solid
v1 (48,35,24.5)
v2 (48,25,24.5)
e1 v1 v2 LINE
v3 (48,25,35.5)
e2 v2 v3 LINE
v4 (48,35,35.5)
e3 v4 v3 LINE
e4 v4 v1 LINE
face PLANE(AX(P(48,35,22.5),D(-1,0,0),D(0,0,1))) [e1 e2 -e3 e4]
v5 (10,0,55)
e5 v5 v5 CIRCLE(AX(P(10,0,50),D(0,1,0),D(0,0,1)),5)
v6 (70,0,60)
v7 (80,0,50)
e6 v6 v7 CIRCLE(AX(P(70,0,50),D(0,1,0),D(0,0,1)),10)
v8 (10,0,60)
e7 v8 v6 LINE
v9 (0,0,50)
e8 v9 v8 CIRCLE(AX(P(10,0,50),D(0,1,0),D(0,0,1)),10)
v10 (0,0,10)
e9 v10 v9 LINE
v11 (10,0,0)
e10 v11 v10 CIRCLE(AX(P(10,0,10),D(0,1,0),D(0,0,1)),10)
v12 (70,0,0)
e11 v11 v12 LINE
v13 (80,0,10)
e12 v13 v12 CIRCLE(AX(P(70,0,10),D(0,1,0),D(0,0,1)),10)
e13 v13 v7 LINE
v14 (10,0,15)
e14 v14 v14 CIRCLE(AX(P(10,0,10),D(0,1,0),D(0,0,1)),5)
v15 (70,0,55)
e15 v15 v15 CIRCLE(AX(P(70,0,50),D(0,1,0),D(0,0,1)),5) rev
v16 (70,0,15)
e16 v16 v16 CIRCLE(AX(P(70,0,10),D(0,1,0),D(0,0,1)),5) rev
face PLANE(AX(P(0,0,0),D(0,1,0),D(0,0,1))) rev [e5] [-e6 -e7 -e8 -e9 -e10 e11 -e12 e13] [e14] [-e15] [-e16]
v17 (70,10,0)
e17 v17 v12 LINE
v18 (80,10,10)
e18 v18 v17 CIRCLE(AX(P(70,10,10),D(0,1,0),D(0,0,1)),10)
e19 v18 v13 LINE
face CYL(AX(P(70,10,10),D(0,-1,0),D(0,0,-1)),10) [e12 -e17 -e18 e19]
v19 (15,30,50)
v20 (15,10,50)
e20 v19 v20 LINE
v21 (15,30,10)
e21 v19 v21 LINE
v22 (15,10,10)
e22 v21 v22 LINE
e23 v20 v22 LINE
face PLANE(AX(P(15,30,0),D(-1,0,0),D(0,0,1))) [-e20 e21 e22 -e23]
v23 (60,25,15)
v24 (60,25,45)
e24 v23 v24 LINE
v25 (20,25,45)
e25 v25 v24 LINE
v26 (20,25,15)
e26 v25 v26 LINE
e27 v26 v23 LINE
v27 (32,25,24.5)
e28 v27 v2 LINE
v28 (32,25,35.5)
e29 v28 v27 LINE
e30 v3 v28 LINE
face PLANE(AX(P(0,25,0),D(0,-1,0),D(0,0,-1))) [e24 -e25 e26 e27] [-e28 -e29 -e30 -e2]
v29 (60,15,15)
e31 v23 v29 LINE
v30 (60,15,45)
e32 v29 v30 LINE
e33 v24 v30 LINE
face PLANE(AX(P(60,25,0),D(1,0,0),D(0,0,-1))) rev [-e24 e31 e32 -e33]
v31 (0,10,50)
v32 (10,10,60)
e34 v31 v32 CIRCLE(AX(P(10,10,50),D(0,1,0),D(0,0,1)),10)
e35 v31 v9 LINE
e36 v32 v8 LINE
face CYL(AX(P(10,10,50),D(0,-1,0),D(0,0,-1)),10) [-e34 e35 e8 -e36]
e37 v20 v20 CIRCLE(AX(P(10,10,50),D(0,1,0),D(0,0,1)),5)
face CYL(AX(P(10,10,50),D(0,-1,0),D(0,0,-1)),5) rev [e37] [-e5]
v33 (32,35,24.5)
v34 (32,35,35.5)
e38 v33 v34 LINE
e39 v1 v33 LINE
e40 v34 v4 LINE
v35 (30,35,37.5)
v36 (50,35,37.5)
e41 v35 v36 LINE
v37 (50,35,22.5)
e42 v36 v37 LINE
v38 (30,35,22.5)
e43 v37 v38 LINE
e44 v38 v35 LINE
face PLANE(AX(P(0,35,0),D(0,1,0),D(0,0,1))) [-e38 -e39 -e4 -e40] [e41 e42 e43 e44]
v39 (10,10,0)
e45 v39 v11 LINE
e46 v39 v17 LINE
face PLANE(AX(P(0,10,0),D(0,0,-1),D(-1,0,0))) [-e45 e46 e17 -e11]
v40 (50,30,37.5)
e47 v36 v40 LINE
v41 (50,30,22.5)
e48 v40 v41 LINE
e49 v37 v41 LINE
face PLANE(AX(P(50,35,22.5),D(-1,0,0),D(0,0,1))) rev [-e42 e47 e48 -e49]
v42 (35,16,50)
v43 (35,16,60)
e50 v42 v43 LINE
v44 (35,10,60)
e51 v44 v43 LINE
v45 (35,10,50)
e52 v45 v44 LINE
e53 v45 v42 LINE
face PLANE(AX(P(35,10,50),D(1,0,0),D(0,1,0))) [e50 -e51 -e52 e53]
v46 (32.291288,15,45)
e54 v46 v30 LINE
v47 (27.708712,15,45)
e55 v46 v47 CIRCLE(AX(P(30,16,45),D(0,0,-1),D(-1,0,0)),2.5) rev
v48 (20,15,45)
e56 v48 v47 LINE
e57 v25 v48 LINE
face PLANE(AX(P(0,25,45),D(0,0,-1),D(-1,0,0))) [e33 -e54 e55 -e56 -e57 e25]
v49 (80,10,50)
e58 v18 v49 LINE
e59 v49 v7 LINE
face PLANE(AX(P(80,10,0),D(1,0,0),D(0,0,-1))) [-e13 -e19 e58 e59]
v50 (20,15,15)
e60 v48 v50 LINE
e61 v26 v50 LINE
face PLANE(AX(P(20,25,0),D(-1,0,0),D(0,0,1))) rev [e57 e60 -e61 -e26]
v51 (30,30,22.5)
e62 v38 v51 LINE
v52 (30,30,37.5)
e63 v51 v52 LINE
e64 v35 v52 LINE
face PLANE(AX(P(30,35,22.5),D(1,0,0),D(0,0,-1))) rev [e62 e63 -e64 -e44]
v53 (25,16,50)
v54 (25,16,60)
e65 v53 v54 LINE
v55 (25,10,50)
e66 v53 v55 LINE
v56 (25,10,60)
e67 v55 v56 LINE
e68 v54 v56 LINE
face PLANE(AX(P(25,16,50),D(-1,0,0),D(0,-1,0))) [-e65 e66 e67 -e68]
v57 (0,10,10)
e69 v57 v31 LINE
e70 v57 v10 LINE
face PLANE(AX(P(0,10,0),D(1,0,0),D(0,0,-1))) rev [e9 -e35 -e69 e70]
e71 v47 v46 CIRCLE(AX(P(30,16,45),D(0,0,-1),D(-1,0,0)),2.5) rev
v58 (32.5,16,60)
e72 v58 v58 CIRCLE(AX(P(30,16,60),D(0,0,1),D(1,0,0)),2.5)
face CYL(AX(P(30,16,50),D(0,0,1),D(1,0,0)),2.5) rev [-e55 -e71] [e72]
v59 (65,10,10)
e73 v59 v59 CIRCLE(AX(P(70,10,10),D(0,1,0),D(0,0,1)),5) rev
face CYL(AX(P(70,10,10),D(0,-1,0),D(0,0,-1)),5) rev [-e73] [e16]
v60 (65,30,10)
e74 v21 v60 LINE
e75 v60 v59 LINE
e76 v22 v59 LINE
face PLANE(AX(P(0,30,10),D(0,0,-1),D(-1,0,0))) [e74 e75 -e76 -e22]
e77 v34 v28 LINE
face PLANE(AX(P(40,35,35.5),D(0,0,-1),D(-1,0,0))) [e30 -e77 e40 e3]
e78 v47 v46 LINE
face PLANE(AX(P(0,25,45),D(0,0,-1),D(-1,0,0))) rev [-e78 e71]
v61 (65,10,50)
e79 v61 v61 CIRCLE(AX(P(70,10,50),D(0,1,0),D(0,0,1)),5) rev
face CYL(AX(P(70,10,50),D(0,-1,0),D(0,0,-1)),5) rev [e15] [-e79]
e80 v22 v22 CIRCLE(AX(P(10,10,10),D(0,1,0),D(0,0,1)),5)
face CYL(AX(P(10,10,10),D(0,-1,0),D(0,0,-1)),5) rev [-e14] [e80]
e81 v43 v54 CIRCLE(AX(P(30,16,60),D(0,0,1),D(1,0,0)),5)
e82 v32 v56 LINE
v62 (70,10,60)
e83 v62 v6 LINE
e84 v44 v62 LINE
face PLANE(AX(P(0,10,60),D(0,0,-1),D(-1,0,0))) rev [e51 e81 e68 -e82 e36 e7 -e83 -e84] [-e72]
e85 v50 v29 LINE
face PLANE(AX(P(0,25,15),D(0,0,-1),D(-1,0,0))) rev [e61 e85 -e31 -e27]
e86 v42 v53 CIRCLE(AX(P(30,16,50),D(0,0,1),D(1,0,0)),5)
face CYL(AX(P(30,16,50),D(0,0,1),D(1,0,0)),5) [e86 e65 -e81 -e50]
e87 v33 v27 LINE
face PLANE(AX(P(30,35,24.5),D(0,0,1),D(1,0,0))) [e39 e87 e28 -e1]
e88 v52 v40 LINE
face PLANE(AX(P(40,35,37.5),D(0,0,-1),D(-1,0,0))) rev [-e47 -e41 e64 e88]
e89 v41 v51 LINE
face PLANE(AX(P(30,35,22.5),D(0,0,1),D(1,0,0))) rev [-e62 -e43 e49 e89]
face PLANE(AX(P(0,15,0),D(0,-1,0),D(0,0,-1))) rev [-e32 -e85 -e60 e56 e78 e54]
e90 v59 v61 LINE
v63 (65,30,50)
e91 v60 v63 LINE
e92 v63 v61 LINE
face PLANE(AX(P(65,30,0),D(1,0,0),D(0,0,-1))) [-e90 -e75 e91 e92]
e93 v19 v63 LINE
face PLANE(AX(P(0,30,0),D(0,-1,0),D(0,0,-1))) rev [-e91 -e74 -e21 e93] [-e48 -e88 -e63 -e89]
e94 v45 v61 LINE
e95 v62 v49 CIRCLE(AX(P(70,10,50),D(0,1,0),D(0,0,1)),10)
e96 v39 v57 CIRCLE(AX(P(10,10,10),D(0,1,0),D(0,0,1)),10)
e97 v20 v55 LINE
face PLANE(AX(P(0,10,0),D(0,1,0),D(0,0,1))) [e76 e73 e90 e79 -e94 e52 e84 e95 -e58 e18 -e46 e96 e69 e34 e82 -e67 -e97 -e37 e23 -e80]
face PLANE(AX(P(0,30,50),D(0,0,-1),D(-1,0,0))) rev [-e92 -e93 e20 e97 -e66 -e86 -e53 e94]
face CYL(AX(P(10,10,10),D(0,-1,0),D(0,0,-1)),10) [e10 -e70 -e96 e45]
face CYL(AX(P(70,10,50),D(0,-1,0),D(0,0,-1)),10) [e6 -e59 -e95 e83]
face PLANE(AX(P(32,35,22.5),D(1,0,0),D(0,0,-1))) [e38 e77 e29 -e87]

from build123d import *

# Parameters (mm, degrees)
SKETCH_1_R            = 10
SKETCH_1_R_2          = 5
EXTRUDE_2_DEPTH       = 10
SKETCH_3_R            = 2.5
EXTRUDE_4_DEPTH       = 10
EXTRUDE_1_OUTLINE_W   = 50
EXTRUDE_1_OUTLINE_H   = 40
EXTRUDE_1_OUTLINE_W_2 = 40
EXTRUDE_1_OUTLINE_H_2 = 30
EXTRUDE_1_DEPTH       = 20
EXTRUDE_1_2_OUTLINE_W = 40
EXTRUDE_1_2_OUTLINE_H = 30
EXTRUDE_1_2_DEPTH     = 5
EXTRUDE_START         = 15
EXTRUDE_1_3_OUTLINE_W = 40
EXTRUDE_1_3_OUTLINE_H = 30
EXTRUDE_1_3_DEPTH     = 5
EXTRUDE_2_2_DEPTH     = 5
SKETCH_15_R           = 2.5
CUT_EXTRUDE_3_DEPTH   = 15
SKETCH_20_W           = 16
SKETCH_20_H           = 11
CUT_EXTRUDE_7_DEPTH   = 10


# Read off the part's stored shape, not the designer's step: 拉伸-薄壁1
with BuildPart() as part:
    # 草图1 → Extrude 2 (new body)
    # profile 1 of 7: a face of its own
    with BuildSketch(Plane(origin=(0, 0, 0), x_dir=(1, 0, 0), z_dir=(0, 1, 0))):
        with BuildLine():
            Line((70, 0), (40, 0))
            Line((40, 0), (40, -30))
            Line((40, -30), (40, -60))
            Line((40, -60), (70, -60))
            ThreePointArc((70, -60), (62.928932188, -42.928932188), (80, -50))
            Line((80, -50), (80, -10))
            ThreePointArc((80, -10), (62.928932188, -17.071067812), (70, 0))
        make_face()
    # profile 2 of 7: a face of its own
    with BuildSketch(Plane(origin=(0, 0, 0), x_dir=(1, 0, 0), z_dir=(0, 1, 0))):
        with BuildLine():
            Line((40, -30), (40, 0))
            Line((40, 0), (10, 0))
            ThreePointArc((10, 0), (17.071067812, -2.928932188), (20, -10))
            ThreePointArc((20, -10), (10, -20), (0, -10))
            Line((0, -10), (0, -30))
            Line((0, -30), (40, -30))
        make_face()
    # profile 3 of 7: a face of its own
    with BuildSketch(Plane(origin=(0, 0, 0), x_dir=(1, 0, 0), z_dir=(0, 1, 0))):
        with BuildLine():
            Line((40, -60), (40, -30))
            Line((40, -30), (0, -30))
            Line((0, -30), (0, -50))
            ThreePointArc((0, -50), (10, -40), (20, -50))
            ThreePointArc((20, -50), (17.071067812, -57.071067812), (10, -60))
            Line((10, -60), (40, -60))
        make_face()
    # profile 4 of 7: a face of its own
    with BuildSketch(Plane(origin=(0, 0, 0), x_dir=(1, 0, 0), z_dir=(0, 1, 0))):
        with Locations((10, -50)):
            Circle(SKETCH_1_R)
        with Locations(Location((10, -50, 0), (0, 0, 270))):
            Circle(SKETCH_1_R_2, mode=Mode.SUBTRACT)
    # profile 5 of 7: a face of its own
    with BuildSketch(Plane(origin=(0, 0, 0), x_dir=(1, 0, 0), z_dir=(0, 1, 0))):
        with Locations((70, -50)):
            Circle(SKETCH_1_R)
        with Locations(Location((70, -50, 0), (0, 0, 270))):
            Circle(SKETCH_1_R_2, mode=Mode.SUBTRACT)
    # profile 6 of 7: a face of its own
    with BuildSketch(Plane(origin=(0, 0, 0), x_dir=(1, 0, 0), z_dir=(0, 1, 0))):
        with Locations((70, -10)):
            Circle(SKETCH_1_R)
        with Locations(Location((70, -10, 0), (0, 0, 270))):
            Circle(SKETCH_1_R_2, mode=Mode.SUBTRACT)
    # profile 7 of 7: a face of its own
    with BuildSketch(Plane(origin=(0, 0, 0), x_dir=(1, 0, 0), z_dir=(0, 1, 0))):
        with Locations((10, -10)):
            Circle(SKETCH_1_R)
        with Locations(Location((10, -10, 0), (0, 0, 270))):
            Circle(SKETCH_1_R_2, mode=Mode.SUBTRACT)
    extrude(amount=EXTRUDE_2_DEPTH)

    # 草图3 → 凸台-拉伸4 (add)
    with BuildSketch(Plane.XY.offset(60)):
        with BuildLine():
            Line((25, 16), (25, 10))
            Line((25, 10), (35, 10))
            Line((35, 10), (35, 16))
            ThreePointArc((35, 16), (30, 21), (25, 16))
        make_face()
        with Locations((30, 16)):
            Circle(SKETCH_3_R, mode=Mode.SUBTRACT)
    extrude(amount=-EXTRUDE_4_DEPTH)

    # 拉伸-薄壁1 outline → 拉伸-薄壁1 (add)
    with BuildSketch(Plane(origin=(0, 10, 0), x_dir=(1, 0, 0), z_dir=(0, 1, 0))):
        with Locations((40, -30)):
            Rectangle(EXTRUDE_1_OUTLINE_W, EXTRUDE_1_OUTLINE_H)
        with Locations((40, -30)):
            Rectangle(EXTRUDE_1_OUTLINE_W_2, EXTRUDE_1_OUTLINE_H_2, mode=Mode.SUBTRACT)
    extrude(amount=EXTRUDE_1_DEPTH)

    # Extrude 1 2 outline → Extrude 1 2 (add)
    with BuildSketch(Plane(origin=(0, 10, 0), x_dir=(1, 0, 0), z_dir=(0, 1, 0))):
        with Locations((40, -30)):
            Rectangle(EXTRUDE_1_2_OUTLINE_W, EXTRUDE_1_2_OUTLINE_H)
    extrude(amount=EXTRUDE_1_2_DEPTH)

    # Extrude 1 3 outline → Extrude 1 3 (add)
    with BuildSketch(Plane(origin=(0, 10, 0), x_dir=(1, 0, 0), z_dir=(0, 1, 0)).offset(EXTRUDE_START)):
        with Locations((40, -30)):
            Rectangle(EXTRUDE_1_3_OUTLINE_W, EXTRUDE_1_3_OUTLINE_H)
    extrude(amount=EXTRUDE_1_3_DEPTH)

    # 草图14 → Extrude 2 2 (add)
    with BuildSketch(Plane(origin=(0, 30, 0), x_dir=(1, 0, 0), z_dir=(0, 1, 0))):
        Polygon((30, -37.5), (30, -22.5), (40, -22.5), (50, -22.5), (50, -37.5), (40, -37.5), align=None)
        Polygon((32, -35.5), (32, -24.5), (40, -24.5), (48, -24.5), (48, -35.5), (40, -35.5), align=None, mode=Mode.SUBTRACT)
    extrude(amount=EXTRUDE_2_2_DEPTH)

    # 草图15 → 切除-拉伸3 (cut)
    with BuildSketch(Plane.XY.offset(60)):
        with Locations((30, 16)):
            Circle(SKETCH_15_R)
    extrude(amount=-CUT_EXTRUDE_3_DEPTH, mode=Mode.SUBTRACT)

    # 草图20 → 切除-拉伸7 (cut)
    with BuildSketch(Plane(origin=(0, 30, 0), x_dir=(1, 0, 0), z_dir=(0, 1, 0))):
        with Locations((40, -30)):
            Rectangle(SKETCH_20_W, SKETCH_20_H)
    extrude(amount=-CUT_EXTRUDE_7_DEPTH, mode=Mode.SUBTRACT)


solid = part.part
